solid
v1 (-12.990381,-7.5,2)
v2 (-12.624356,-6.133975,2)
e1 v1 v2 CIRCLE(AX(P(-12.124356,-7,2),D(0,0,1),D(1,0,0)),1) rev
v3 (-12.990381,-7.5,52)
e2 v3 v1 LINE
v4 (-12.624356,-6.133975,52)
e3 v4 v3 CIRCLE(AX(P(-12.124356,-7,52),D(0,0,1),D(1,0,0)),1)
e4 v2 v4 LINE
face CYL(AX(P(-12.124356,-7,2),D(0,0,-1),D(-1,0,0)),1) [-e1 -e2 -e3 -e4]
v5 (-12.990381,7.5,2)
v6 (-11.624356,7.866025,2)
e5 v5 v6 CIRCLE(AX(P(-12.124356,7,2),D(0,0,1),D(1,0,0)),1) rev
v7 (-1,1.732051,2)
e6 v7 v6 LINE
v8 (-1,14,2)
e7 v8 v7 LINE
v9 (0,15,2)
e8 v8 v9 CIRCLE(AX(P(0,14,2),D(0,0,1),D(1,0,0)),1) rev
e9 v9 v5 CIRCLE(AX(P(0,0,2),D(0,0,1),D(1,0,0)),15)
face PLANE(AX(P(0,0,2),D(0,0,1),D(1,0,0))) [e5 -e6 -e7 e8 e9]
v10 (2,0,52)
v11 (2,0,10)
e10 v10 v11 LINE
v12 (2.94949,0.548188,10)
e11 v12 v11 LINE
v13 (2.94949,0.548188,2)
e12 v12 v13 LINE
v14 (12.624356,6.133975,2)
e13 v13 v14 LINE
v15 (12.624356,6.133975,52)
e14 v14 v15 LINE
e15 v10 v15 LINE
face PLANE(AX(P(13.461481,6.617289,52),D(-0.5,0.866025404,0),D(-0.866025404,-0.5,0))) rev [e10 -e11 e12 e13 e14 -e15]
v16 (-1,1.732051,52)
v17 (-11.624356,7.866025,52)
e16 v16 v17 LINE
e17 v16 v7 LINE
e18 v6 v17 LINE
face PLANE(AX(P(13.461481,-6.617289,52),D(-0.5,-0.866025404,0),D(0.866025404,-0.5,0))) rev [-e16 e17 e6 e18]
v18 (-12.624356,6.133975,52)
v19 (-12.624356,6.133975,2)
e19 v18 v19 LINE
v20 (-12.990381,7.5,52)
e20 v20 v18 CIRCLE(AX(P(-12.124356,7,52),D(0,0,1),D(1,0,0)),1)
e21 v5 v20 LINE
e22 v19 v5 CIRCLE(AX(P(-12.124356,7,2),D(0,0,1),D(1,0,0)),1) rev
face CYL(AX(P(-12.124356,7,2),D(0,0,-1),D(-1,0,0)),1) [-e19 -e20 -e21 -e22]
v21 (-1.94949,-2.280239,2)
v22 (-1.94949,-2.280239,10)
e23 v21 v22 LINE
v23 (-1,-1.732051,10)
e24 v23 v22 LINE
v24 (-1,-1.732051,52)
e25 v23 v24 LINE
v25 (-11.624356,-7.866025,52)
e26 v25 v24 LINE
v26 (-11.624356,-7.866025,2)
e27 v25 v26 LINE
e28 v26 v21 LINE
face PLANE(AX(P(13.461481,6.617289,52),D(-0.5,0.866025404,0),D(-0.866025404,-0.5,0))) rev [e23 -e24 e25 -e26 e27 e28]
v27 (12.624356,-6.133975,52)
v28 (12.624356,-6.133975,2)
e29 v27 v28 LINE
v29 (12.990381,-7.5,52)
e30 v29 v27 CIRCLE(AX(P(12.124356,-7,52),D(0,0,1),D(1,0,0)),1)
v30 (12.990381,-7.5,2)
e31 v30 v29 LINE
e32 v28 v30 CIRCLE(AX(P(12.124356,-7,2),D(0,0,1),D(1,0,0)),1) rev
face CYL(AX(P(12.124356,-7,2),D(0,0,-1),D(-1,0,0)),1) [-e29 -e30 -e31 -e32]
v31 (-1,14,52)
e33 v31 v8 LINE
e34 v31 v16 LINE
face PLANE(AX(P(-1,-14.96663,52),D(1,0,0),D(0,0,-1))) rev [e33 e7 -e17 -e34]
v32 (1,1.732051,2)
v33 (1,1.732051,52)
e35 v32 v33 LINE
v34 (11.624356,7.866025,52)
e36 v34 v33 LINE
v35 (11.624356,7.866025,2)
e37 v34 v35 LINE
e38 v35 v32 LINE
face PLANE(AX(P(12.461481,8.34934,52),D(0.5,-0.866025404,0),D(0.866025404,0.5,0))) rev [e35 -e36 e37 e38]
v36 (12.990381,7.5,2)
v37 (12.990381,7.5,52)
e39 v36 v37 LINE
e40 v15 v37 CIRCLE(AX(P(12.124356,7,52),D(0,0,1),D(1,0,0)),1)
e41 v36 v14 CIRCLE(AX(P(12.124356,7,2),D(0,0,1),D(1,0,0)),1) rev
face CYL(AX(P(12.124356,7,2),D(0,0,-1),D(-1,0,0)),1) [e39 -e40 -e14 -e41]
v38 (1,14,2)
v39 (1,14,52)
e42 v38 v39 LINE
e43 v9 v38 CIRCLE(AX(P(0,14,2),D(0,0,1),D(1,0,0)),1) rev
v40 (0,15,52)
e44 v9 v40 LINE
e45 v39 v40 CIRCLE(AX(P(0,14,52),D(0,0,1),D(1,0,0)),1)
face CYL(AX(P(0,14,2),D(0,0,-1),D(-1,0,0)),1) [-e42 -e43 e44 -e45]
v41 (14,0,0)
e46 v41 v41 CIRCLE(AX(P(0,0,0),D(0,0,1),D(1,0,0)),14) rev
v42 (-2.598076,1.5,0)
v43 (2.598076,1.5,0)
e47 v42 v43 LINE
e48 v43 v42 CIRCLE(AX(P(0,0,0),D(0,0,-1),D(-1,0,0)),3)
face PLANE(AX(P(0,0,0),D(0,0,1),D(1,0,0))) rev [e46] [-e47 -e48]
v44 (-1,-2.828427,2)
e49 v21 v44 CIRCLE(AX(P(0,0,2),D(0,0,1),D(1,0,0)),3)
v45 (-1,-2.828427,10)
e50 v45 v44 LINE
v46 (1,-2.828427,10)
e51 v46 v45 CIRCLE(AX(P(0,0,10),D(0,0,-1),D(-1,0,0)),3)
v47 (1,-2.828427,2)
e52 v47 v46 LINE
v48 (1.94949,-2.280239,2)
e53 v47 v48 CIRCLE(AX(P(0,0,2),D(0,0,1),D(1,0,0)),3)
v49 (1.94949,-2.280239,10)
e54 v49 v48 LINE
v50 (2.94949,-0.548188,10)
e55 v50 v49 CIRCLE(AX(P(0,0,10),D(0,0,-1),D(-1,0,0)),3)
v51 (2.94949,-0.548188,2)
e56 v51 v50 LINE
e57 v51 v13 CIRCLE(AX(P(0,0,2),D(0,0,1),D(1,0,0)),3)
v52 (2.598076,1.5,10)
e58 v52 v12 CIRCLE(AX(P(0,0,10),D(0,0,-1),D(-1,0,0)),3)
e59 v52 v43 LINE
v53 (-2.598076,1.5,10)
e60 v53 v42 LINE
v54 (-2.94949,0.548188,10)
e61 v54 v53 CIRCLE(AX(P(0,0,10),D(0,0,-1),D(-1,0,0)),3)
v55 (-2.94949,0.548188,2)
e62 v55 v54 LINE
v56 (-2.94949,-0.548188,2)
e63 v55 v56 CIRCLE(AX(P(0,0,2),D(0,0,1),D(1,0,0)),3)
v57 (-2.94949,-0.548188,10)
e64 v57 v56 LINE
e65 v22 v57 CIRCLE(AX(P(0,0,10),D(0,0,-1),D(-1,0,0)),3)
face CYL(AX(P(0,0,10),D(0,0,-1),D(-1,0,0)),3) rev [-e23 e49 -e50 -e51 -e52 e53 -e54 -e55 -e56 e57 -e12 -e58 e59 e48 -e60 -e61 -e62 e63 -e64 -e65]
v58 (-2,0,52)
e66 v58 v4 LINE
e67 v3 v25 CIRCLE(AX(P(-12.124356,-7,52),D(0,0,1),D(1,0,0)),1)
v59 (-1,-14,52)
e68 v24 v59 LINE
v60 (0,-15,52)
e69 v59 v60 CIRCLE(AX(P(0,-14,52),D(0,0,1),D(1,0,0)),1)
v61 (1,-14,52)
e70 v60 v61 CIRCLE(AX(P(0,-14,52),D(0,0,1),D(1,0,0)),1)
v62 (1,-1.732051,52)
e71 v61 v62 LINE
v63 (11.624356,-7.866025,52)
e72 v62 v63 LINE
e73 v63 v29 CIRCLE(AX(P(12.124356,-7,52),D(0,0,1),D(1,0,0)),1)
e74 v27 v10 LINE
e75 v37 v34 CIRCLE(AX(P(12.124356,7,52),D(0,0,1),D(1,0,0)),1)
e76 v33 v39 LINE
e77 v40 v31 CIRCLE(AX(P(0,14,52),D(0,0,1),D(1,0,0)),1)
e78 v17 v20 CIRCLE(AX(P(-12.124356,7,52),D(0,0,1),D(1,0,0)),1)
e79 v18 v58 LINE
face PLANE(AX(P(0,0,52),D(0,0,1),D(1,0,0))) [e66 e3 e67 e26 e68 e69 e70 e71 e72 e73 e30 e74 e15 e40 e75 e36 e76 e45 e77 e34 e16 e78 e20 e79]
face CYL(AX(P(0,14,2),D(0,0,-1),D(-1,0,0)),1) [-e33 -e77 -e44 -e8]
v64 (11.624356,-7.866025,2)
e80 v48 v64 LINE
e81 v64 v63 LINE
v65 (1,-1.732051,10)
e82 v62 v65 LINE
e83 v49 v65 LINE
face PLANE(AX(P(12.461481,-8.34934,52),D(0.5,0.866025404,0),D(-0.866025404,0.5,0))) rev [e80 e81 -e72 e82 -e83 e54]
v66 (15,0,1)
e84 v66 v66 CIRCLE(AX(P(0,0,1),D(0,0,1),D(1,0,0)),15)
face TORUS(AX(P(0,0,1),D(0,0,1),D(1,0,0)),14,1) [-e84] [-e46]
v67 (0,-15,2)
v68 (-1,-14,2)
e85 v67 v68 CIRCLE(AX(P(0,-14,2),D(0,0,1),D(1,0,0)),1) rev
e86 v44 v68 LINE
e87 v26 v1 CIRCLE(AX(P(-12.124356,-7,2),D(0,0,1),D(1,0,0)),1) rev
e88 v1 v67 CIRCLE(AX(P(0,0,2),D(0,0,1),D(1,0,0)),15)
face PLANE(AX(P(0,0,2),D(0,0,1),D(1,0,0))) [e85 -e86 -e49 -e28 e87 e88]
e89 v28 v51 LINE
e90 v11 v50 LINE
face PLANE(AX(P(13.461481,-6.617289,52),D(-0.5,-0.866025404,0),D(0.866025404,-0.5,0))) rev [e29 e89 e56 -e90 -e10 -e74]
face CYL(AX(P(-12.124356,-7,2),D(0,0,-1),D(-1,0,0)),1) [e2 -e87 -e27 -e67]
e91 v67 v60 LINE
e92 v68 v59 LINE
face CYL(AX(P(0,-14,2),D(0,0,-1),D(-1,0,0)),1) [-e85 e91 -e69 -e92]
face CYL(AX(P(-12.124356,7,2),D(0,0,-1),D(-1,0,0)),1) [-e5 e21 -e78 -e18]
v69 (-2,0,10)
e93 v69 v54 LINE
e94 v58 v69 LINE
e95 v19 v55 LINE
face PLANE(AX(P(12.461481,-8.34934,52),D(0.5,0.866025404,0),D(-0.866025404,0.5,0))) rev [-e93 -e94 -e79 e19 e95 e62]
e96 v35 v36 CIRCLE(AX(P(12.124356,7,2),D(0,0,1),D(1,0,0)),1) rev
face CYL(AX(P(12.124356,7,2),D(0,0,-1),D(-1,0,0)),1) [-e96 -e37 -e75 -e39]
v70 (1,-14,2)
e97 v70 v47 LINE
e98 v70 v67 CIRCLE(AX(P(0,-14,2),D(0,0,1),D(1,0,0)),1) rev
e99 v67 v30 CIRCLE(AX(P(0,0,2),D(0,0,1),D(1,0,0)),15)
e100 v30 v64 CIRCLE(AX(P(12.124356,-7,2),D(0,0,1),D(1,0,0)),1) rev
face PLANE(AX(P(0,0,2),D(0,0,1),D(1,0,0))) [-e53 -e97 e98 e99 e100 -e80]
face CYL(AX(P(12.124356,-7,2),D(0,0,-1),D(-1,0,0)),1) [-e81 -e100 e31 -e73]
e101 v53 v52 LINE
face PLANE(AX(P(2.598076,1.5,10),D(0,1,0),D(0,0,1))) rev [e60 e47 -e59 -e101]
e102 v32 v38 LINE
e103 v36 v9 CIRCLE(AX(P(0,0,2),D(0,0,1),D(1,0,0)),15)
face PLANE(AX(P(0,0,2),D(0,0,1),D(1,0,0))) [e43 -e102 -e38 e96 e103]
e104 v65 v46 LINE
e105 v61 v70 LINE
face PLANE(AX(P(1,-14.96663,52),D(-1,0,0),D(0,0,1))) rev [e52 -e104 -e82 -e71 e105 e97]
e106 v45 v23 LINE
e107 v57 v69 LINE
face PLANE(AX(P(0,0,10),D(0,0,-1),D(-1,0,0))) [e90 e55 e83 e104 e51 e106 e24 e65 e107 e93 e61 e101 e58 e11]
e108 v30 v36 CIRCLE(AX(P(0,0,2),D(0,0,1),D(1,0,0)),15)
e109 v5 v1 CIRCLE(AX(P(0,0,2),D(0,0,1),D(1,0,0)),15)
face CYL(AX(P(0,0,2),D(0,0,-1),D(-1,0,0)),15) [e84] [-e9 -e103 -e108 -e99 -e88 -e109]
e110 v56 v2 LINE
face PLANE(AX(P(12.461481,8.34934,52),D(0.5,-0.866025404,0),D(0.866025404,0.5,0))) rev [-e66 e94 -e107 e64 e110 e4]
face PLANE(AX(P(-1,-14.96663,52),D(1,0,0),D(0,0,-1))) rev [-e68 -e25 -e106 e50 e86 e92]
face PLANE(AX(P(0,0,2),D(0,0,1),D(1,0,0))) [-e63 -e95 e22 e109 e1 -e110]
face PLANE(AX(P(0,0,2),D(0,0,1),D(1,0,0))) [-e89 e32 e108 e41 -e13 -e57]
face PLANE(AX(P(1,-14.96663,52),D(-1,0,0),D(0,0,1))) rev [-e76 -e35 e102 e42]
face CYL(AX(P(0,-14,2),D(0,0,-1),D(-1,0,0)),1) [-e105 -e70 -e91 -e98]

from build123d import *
from build123d.topology import SkipClean

# Parameters (mm, degrees)
SKETCH1_R           = 15
BOSS_EXTRUDE1_DEPTH = 2
BOSS_EXTRUDE2_DEPTH = 50
CIRPATTERN1_COUNT   = 3
CIRPATTERN1_ANGLE   = 120
CUT_EXTRUDE1_DEPTH  = 10
FILLET2_R           = 1
FILLET3_R           = 1


with BuildPart() as part:
    # Sketch1 → Boss-Extrude1 (new body)
    with BuildSketch(Plane.XY):
        Circle(SKETCH1_R)
    extrude(amount=BOSS_EXTRUDE1_DEPTH)

    # Sketch2 → Boss-Extrude2 (add)
    with SkipClean():  # the faces are left unmerged after this step: merging them gives an invalid solid
        with BuildSketch(Plane.XY.offset(2)):
            with BuildLine():
                Line((-1, -14.966629547), (-1, 14.966629547))
                ThreePointArc((-1, 14.966629547), (0, 15), (1, 14.966629547))
                Line((1, 14.966629547), (1, -14.966629547))
                ThreePointArc((1, -14.966629547), (0, -15), (-1, -14.966629547))
            make_face()
        boss_extrude2 = extrude(amount=BOSS_EXTRUDE2_DEPTH)

    # CirPattern1: Boss-Extrude2 ×3 about axis
    with SkipClean():  # the faces are left unmerged after this step: merging them gives an invalid solid
        cirpattern1_axis = Axis((0, 0, 0), (0, 0, 1))
        for i in range(1, CIRPATTERN1_COUNT):
            add(boss_extrude2.rotate(cirpattern1_axis, i * CIRPATTERN1_ANGLE / (CIRPATTERN1_COUNT - 1)))

    # Sketch3 → Cut-Extrude1 (cut)
    with SkipClean():  # the faces are left unmerged after this step: merging them gives an invalid solid
        with BuildSketch(Plane(origin=(0, 0, 0), x_dir=(-1, 0, 0), z_dir=(0, 0, -1))):
            with BuildLine():
                Line((-2.598076211, 1.5), (2.598076211, 1.5))
                ThreePointArc((2.598076211, 1.5), (0, -3), (-2.598076211, 1.5))
            make_face()
        extrude(amount=-CUT_EXTRUDE1_DEPTH, mode=Mode.SUBTRACT)

    # Fillet2
    # the kernel refuses this fillet: 1 mm, written as the material it takes off along each edge
    with BuildSketch(Plane(origin=(12.461481397, 8.349340177, 2), x_dir=(0.5286054177499072, -0.8488676647896573, 0), z_dir=(0, 0, 1)), Plane(origin=(-12.461481397, -8.349340177, 2), x_dir=(-0.5286054177499102, 0.8488676647896556, 0), z_dir=(0, 0, 1)), Plane(origin=(-13.461481397, 6.61728937, 2), x_dir=(0.4708382532840629, 0.882219552744334, 0), z_dir=(0, 0, 1)), Plane(origin=(13.461481397, -6.61728937, 2), x_dir=(-0.47083825328406437, -0.8822195527443331, 0), z_dir=(0, 0, 1)), Plane(origin=(-1, 14.966629547, 2), x_dir=(0.9994436710339702, 0.03335188795467453, 0), z_dir=(0, 0, 1)), Plane(origin=(1, -14.966629547, 2), x_dir=(-0.9994436710339702, -0.03335188795467453, 0), z_dir=(0, 0, 1))) as fillet2_piece_1:
        with BuildLine():
            CenterArc((0.967204751, -0.999443671), FILLET2_R, 88.088723135, 90)
            Line((-0.03223892, -0.966091783), (0, 0))
            ThreePointArc((0, 0), (0.500278319, 0.008344934), (1.000556639, 0))
        make_face()
    extrude(amount=52.501391597, mode=Mode.SUBTRACT)
    with BuildSketch(Plane(origin=(-12.461481397, 8.349340177, 2), x_dir=(-0.5286054177498939, -0.8488676647896658, 0), z_dir=(0, 0, 1)), Plane(origin=(12.461481397, -8.349340177, 2), x_dir=(0.52860541774991, 0.8488676647896555, 0), z_dir=(0, 0, 1)), Plane(origin=(13.461481397, 6.61728937, 2), x_dir=(-0.4708382532840634, 0.8822195527443337, 0), z_dir=(0, 0, 1)), Plane(origin=(-13.461481397, -6.61728937, 2), x_dir=(0.470838253284063, -0.8822195527443338, 0), z_dir=(0, 0, 1)), Plane(origin=(1, 14.966629547, 2), x_dir=(-0.9994436710339702, 0.03335188795467452, 0), z_dir=(0, 0, 1)), Plane(origin=(-1, -14.966629547, 2), x_dir=(0.9994436710339702, -0.03335188795467453, 0), z_dir=(0, 0, 1))) as fillet2_piece_2:
        with BuildLine():
            CenterArc((0.967204751, 0.999443671), FILLET2_R, 181.911276865, 90)
            Line((-0.03223892, 0.966091783), (0, 0))
            ThreePointArc((0, 0), (0.500278319, -0.008344934), (1.000556639, 0))
        make_face()
    extrude(amount=52.501391597, mode=Mode.SUBTRACT)

    # Fillet3
    fillet3_edges = [part.edges().sort_by_distance(p)[0] for p in [
        (-15, 0, 0),
    ]]
    fillet(fillet3_edges, radius=FILLET3_R)


solid = part.part
